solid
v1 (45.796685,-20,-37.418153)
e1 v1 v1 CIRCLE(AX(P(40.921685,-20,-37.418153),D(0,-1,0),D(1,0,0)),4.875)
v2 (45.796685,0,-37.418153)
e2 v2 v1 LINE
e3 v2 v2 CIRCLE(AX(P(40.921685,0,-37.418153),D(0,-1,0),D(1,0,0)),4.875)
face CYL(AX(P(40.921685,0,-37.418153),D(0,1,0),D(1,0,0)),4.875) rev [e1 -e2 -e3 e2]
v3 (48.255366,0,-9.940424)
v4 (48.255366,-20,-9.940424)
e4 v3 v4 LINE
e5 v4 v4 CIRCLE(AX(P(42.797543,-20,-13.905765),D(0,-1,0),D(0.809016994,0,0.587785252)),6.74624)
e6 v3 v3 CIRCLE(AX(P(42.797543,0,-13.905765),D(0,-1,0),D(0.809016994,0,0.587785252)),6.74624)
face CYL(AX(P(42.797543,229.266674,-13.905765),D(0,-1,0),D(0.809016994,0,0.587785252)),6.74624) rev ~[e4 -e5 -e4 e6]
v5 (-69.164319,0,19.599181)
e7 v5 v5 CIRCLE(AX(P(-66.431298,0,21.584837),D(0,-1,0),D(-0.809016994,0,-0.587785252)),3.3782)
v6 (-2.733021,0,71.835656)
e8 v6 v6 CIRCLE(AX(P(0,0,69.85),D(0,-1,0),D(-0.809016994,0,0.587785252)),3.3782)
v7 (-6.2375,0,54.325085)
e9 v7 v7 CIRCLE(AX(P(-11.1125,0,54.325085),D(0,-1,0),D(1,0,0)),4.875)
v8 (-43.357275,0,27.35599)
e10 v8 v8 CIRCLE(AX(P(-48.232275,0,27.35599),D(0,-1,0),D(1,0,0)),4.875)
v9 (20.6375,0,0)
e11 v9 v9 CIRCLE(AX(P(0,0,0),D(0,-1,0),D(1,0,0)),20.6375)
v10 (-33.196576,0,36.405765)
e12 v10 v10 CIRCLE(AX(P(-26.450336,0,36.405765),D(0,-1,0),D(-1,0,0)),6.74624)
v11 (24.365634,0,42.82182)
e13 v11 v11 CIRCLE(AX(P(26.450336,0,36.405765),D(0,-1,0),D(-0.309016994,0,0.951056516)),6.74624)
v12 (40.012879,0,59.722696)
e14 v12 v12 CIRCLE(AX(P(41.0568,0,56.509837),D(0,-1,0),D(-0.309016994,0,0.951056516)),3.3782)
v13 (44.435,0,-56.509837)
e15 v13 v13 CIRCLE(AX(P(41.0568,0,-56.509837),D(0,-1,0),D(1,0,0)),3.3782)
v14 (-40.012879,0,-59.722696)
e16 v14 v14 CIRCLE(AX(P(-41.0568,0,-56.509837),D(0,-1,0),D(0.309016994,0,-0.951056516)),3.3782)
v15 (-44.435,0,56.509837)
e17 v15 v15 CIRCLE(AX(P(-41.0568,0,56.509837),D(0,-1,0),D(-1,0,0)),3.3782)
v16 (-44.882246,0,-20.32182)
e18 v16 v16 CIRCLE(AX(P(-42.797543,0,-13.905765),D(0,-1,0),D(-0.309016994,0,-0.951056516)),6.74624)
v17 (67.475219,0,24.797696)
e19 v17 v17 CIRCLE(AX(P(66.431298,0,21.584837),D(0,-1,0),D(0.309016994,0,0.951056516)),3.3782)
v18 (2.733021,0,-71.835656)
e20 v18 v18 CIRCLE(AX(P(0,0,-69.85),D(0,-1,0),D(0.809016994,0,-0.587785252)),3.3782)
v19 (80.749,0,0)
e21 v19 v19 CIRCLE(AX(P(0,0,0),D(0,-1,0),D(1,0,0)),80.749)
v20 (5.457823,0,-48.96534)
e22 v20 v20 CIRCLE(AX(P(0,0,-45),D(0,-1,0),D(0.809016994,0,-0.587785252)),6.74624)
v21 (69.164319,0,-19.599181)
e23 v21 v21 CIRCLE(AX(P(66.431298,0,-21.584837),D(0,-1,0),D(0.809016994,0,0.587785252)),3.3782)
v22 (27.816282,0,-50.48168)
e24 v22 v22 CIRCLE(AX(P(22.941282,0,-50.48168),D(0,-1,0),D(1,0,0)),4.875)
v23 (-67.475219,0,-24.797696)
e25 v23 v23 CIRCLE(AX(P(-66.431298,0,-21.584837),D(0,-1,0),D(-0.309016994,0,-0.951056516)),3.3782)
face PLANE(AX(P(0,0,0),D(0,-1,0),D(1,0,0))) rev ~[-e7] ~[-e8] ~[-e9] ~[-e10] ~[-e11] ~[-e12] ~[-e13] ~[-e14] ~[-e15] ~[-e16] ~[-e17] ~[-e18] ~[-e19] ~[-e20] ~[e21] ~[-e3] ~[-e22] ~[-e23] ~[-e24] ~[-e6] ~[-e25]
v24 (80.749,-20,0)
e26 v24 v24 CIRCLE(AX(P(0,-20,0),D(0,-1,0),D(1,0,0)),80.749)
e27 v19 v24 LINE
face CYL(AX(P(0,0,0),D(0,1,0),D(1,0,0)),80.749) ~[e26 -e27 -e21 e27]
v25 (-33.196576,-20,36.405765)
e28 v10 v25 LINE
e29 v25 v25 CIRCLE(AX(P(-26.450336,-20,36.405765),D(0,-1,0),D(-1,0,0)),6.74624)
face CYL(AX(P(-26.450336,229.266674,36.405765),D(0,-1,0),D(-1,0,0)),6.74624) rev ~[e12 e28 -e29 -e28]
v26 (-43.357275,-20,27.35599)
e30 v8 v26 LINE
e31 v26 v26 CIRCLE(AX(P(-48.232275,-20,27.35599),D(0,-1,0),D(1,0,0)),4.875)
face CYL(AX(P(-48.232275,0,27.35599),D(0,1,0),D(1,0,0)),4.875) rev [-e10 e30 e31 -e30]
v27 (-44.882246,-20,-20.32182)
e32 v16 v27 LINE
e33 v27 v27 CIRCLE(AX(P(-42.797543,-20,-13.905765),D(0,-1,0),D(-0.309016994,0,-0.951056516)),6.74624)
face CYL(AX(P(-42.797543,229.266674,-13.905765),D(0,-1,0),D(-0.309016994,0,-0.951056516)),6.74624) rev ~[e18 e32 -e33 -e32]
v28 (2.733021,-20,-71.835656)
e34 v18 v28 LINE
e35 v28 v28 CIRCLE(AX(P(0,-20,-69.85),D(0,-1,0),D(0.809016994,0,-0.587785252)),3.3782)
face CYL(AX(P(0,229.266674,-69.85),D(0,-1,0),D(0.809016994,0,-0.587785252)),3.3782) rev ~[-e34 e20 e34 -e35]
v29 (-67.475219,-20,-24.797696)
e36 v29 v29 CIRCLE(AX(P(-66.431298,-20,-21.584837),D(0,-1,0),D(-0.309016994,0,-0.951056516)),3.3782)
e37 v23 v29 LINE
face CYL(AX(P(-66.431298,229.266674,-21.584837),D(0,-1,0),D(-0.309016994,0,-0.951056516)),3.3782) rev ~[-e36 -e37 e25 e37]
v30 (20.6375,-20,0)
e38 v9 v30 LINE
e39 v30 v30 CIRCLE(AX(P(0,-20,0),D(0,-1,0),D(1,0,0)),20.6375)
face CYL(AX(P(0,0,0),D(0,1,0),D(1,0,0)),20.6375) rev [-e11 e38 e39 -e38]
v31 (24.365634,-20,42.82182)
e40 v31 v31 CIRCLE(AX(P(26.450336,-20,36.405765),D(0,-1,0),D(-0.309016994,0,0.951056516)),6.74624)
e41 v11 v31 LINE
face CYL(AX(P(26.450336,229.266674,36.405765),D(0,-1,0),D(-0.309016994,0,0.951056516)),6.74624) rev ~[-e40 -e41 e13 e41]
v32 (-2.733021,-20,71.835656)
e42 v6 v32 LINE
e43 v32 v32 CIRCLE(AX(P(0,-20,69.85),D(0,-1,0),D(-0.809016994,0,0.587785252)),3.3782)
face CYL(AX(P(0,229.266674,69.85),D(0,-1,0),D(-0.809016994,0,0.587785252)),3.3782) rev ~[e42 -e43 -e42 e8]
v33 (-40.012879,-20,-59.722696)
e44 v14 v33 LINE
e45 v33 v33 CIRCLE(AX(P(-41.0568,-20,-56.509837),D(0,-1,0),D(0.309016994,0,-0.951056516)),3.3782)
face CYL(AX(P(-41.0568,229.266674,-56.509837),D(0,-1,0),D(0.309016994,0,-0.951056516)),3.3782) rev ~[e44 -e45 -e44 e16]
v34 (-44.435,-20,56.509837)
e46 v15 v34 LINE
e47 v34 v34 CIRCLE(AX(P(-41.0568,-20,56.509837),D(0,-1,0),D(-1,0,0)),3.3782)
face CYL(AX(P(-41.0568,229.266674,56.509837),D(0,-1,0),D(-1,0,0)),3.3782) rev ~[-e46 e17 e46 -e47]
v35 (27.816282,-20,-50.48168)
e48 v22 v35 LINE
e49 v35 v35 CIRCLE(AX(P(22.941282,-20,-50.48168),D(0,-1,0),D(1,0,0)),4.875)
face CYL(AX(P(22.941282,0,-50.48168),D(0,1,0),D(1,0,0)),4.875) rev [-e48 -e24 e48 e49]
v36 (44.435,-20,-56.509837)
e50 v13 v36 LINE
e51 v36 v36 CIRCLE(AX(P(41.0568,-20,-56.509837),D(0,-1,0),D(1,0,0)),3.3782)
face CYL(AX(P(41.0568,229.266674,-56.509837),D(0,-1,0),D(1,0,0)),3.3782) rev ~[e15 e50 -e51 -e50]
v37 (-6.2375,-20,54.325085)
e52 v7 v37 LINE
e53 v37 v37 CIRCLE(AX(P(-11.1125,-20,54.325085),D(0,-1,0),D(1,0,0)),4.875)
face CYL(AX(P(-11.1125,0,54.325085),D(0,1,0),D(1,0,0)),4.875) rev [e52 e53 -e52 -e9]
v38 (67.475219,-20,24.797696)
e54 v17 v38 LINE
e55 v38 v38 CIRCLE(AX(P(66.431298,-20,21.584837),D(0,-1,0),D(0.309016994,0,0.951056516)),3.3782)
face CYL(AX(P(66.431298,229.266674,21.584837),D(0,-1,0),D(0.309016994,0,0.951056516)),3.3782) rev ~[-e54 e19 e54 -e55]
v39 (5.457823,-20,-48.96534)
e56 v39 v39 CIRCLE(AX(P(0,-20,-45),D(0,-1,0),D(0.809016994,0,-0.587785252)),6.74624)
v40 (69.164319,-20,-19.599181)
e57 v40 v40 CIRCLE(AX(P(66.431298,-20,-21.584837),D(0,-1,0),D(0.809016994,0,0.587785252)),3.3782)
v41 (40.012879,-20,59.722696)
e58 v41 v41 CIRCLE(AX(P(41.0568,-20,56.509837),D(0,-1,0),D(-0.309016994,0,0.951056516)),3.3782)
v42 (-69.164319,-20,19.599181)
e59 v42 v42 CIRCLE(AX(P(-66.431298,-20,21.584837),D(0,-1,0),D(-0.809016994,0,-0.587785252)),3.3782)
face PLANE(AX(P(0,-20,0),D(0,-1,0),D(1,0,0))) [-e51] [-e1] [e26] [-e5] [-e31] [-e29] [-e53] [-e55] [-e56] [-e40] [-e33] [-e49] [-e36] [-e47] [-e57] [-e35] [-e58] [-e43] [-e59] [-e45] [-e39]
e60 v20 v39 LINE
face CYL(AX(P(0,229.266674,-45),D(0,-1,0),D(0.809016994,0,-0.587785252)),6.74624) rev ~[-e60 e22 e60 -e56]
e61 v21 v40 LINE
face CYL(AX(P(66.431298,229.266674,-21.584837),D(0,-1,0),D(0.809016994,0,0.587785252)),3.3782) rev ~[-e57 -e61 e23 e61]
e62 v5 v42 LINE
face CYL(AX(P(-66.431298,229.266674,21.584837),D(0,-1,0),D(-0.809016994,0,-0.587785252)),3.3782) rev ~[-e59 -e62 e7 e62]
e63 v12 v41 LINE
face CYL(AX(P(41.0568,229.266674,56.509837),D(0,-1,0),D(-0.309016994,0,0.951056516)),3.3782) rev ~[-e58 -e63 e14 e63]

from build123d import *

# Parameters (mm, degrees)
F0_R            = 80.749
F0_R_2          = 4.875
F0_R_3          = 20.6375
F1_DEPTH        = 20
F2_D            = 13.49248
F2_COPIES_COUNT = 5
F3_D            = 6.7564
F3_COPIES_COUNT = 10


# Not quite as in the source:
# - a pattern or mirror of a feature is missing from the dataset's text; its kind, count and spacing are read off the source's solid
# - a feature names something its author has since deleted; it is built from what else it names


with BuildPart() as f1:
    # F0 (on Front) → F1 (new body)
    with BuildSketch(Plane.XZ):
        Circle(F0_R)
        with Locations((-22.9412823532, -50.481680479)):
            Circle(F0_R_2, mode=Mode.SUBTRACT)
        with Locations((-40.9216850532, -37.4181532468)):
            Circle(F0_R_2, mode=Mode.SUBTRACT)
        Circle(F0_R_3, mode=Mode.SUBTRACT)
        with Locations((22.9412823532, -50.481680479)):
            Circle(F0_R_2, mode=Mode.SUBTRACT)
        with Locations((40.9216850532, -37.4181532468)):
            Circle(F0_R_2, mode=Mode.SUBTRACT)
        with Locations((-55.100177293, 6.2187589016)):
            Circle(F0_R_2, mode=Mode.SUBTRACT)
        with Locations((-48.2322745931, 27.3559899762)):
            Circle(F0_R_2, mode=Mode.SUBTRACT)
        with Locations((-11.1125, 54.3250848481)):
            Circle(F0_R_2, mode=Mode.SUBTRACT)
        with Locations((55.100177293, 6.2187589016)):
            Circle(F0_R_2, mode=Mode.SUBTRACT)
        with Locations((48.2322745931, 27.3559899762)):
            Circle(F0_R_2, mode=Mode.SUBTRACT)
        with Locations((11.1125, 54.3250848481)):
            Circle(F0_R_2, mode=Mode.SUBTRACT)
        with Locations((-55.100177293, 6.2187589016)):
            Circle(F0_R_2)
        with Locations((-40.9216850532, -37.4181532468)):
            Circle(F0_R_2)
        with Locations((-22.9412823532, -50.481680479)):
            Circle(F0_R_2)
        with Locations((55.100177293, 6.2187589016)):
            Circle(F0_R_2)
        with Locations((48.2322745931, 27.3559899762)):
            Circle(F0_R_2)
        with Locations((11.1125, 54.3250848481)):
            Circle(F0_R_2)
    extrude(amount=F1_DEPTH)

    # F2 (through all)
    with Locations(Plane(origin=(0, 0, 0), x_dir=(1, 0, 0), z_dir=(0, 1, 0))):
        with Locations((-26.4503363532, -36.4057647469)):
            f2 = Hole(F2_D / 2)

    # F2_copies: F2 ×5 about axis
    f2_copies_axis = Axis((0, 0, 0), (0, 1, 0))
    for i in range(1, F2_COPIES_COUNT):
        add(f2.rotate(f2_copies_axis, i * 360 / F2_COPIES_COUNT), mode=Mode.SUBTRACT)

    # F3 (through all)
    with Locations(Plane(origin=(0, 0, 0), x_dir=(1, 0, 0), z_dir=(0, 1, 0))):
        with Locations((-41.0567998726, -56.5098370571)):
            f3 = Hole(F3_D / 2)

    # F3_copies: F3 ×10 about axis
    f3_copies_axis = Axis((0, 0, 0), (0, 1, 0))
    for i in range(1, F3_COPIES_COUNT):
        add(f3.rotate(f3_copies_axis, i * 360 / F3_COPIES_COUNT), mode=Mode.SUBTRACT)


solid = f1.part
